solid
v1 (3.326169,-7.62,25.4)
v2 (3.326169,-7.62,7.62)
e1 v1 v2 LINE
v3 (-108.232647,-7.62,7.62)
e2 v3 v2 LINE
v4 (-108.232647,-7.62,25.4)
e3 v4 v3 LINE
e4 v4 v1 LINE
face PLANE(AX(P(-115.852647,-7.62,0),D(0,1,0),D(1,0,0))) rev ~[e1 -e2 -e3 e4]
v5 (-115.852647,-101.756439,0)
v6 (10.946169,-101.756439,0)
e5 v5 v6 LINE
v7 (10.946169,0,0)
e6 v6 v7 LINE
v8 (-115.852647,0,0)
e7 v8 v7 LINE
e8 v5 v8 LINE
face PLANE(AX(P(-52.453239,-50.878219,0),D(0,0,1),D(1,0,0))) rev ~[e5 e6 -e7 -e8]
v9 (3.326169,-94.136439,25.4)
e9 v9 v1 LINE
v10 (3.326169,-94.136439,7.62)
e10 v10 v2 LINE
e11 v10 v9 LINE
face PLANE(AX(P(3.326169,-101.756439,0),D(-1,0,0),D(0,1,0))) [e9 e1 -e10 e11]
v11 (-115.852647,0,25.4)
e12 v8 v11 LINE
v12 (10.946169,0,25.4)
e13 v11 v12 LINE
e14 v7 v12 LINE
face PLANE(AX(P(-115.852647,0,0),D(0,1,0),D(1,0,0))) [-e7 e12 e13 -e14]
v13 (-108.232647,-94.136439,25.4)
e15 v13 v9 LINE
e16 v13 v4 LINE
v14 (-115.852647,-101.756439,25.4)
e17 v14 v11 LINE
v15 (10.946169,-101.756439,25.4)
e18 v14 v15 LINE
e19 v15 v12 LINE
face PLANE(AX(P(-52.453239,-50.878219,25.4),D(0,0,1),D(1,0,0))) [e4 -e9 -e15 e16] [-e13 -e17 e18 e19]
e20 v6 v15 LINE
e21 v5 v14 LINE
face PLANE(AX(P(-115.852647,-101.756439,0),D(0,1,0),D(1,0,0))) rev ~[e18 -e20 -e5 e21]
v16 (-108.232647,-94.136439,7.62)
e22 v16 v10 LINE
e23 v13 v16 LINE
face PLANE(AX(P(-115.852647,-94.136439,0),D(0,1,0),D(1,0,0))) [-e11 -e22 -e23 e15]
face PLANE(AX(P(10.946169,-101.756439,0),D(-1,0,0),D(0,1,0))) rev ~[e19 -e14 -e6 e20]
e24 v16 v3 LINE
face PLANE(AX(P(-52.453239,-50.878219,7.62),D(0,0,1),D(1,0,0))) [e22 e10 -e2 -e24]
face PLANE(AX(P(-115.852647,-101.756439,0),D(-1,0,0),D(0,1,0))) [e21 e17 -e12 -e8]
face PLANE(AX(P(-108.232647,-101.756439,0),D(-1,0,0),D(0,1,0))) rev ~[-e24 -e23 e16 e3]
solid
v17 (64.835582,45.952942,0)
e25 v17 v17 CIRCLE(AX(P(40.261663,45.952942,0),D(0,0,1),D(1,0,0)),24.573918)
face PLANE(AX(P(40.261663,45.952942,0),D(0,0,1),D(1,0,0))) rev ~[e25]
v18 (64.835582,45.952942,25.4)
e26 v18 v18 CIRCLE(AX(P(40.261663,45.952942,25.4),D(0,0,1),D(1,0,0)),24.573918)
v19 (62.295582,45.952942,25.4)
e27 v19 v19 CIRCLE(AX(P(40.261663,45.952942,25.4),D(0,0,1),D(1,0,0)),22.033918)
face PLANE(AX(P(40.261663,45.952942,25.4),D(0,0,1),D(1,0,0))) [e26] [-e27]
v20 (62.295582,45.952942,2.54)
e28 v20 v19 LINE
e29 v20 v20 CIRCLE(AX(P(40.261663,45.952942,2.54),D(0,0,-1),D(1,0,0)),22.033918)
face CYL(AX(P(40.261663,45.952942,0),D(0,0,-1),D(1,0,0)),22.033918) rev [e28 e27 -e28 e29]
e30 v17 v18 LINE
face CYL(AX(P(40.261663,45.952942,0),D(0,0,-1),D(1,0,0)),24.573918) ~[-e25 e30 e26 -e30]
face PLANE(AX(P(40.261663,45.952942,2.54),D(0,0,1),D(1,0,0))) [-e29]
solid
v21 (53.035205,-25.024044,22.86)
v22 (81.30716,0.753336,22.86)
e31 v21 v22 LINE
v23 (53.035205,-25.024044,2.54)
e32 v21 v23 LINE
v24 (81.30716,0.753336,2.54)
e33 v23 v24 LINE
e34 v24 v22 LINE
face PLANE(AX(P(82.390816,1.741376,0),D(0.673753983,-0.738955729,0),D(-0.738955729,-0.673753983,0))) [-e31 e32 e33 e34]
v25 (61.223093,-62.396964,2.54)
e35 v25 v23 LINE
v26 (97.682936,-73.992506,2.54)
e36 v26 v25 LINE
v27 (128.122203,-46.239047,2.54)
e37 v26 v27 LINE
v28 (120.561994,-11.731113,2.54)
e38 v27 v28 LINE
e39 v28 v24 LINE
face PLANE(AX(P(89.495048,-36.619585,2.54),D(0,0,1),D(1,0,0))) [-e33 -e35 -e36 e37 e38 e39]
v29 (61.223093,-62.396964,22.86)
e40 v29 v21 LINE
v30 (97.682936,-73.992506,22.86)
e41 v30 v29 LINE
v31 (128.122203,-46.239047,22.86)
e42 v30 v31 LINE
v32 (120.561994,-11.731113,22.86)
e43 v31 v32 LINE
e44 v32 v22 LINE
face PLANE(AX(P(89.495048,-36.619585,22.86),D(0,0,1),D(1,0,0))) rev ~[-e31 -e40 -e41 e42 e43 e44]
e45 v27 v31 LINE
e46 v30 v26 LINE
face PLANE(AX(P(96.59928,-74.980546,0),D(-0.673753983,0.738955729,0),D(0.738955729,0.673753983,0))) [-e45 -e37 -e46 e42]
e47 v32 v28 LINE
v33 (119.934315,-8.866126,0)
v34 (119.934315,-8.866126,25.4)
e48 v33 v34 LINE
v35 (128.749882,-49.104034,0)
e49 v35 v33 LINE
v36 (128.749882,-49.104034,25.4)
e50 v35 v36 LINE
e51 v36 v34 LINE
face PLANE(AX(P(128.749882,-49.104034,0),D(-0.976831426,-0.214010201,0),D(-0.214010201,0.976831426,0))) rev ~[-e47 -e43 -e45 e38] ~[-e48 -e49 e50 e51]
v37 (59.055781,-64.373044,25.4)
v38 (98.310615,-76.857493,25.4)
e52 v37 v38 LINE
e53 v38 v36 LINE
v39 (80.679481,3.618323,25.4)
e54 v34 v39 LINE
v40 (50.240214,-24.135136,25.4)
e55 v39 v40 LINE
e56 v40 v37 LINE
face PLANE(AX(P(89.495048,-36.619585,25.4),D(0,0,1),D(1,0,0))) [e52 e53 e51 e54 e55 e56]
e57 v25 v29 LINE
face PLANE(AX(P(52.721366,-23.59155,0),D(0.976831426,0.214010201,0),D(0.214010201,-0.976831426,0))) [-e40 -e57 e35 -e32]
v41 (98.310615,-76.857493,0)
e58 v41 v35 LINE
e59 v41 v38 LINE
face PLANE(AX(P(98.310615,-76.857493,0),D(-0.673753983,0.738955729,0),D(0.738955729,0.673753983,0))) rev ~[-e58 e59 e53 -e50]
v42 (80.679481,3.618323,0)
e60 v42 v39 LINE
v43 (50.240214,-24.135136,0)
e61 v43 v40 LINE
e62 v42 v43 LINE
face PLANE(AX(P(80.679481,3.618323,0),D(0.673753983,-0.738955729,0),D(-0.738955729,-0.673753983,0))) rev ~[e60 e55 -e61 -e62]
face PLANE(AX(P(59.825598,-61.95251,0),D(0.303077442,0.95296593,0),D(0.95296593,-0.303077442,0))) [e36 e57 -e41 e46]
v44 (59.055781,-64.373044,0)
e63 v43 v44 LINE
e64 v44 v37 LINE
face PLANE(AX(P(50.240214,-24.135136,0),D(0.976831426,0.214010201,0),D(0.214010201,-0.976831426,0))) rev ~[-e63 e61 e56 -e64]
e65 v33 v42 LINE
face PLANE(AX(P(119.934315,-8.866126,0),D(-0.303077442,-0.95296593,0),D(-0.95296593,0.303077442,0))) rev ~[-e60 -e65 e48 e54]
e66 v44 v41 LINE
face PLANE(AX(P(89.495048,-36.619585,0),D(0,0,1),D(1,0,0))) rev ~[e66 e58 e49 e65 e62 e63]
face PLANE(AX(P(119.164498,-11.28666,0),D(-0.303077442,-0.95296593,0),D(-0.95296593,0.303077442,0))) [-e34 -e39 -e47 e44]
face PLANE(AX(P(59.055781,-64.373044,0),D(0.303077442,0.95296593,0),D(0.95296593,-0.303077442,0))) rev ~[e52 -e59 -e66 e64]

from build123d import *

# Parameters (mm, degrees)
F0_W     = 126.7988150939
F0_H     = 101.7564386129
F1_DEPTH = 25.4
F0_R     = 24.5739182838
F2_T     = -7.62
F3_T     = -2.54
F4_T     = -2.54


# Not quite as in the source:
# - a feature of the source that left no trace in its solid (it failed there, or was rolled back) is left out


with BuildPart() as f1:
    # F0 (on Top) → F1 (new body)
    with BuildSketch(Plane.XY):
        with Locations((-52.4532389827, -50.8782193065)):
            Rectangle(F0_W, F0_H)
    extrude(amount=F1_DEPTH)

    # F2
    f2_openings = [f1.faces().sort_by_distance(p)[0] for p in [
        (-52.453239, -50.878219, 25.4),
    ]]
    offset(amount=F2_T, openings=f2_openings)


with BuildPart() as f1b:
    # F0 (on Top) → F1, piece 2 (new body)
    with BuildSketch(Plane.XY):
        with Locations((40.2616634965, 45.9529422224)):
            Circle(F0_R)
    extrude(amount=F1_DEPTH)

    # F3
    f3_openings = [f1b.faces().sort_by_distance(p)[0] for p in [
        (40.261663, 45.952942, 25.4),
    ]]
    offset(amount=F3_T, openings=f3_openings)


with BuildPart() as f1c:
    # F0 (on Top) → F1, piece 3 (new body)
    with BuildSketch(Plane.XY):
        Polygon((98.3106148388, -76.8574930794), (128.7498819683, -49.104034149), (119.9343150564, -8.866126077), (80.679481015, 3.6183230645), (50.2402138855, -24.1351358659), (59.0557807974, -64.3730439379), align=None)
    extrude(amount=F1_DEPTH)

    # F4
    f4_openings = [f1c.faces().sort_by_distance(p)[0] for p in [
        (124.342099, -28.98508, 12.7),
    ]]
    offset(amount=F4_T, openings=f4_openings)


solid = Compound([f1.part, f1b.part, f1c.part])
